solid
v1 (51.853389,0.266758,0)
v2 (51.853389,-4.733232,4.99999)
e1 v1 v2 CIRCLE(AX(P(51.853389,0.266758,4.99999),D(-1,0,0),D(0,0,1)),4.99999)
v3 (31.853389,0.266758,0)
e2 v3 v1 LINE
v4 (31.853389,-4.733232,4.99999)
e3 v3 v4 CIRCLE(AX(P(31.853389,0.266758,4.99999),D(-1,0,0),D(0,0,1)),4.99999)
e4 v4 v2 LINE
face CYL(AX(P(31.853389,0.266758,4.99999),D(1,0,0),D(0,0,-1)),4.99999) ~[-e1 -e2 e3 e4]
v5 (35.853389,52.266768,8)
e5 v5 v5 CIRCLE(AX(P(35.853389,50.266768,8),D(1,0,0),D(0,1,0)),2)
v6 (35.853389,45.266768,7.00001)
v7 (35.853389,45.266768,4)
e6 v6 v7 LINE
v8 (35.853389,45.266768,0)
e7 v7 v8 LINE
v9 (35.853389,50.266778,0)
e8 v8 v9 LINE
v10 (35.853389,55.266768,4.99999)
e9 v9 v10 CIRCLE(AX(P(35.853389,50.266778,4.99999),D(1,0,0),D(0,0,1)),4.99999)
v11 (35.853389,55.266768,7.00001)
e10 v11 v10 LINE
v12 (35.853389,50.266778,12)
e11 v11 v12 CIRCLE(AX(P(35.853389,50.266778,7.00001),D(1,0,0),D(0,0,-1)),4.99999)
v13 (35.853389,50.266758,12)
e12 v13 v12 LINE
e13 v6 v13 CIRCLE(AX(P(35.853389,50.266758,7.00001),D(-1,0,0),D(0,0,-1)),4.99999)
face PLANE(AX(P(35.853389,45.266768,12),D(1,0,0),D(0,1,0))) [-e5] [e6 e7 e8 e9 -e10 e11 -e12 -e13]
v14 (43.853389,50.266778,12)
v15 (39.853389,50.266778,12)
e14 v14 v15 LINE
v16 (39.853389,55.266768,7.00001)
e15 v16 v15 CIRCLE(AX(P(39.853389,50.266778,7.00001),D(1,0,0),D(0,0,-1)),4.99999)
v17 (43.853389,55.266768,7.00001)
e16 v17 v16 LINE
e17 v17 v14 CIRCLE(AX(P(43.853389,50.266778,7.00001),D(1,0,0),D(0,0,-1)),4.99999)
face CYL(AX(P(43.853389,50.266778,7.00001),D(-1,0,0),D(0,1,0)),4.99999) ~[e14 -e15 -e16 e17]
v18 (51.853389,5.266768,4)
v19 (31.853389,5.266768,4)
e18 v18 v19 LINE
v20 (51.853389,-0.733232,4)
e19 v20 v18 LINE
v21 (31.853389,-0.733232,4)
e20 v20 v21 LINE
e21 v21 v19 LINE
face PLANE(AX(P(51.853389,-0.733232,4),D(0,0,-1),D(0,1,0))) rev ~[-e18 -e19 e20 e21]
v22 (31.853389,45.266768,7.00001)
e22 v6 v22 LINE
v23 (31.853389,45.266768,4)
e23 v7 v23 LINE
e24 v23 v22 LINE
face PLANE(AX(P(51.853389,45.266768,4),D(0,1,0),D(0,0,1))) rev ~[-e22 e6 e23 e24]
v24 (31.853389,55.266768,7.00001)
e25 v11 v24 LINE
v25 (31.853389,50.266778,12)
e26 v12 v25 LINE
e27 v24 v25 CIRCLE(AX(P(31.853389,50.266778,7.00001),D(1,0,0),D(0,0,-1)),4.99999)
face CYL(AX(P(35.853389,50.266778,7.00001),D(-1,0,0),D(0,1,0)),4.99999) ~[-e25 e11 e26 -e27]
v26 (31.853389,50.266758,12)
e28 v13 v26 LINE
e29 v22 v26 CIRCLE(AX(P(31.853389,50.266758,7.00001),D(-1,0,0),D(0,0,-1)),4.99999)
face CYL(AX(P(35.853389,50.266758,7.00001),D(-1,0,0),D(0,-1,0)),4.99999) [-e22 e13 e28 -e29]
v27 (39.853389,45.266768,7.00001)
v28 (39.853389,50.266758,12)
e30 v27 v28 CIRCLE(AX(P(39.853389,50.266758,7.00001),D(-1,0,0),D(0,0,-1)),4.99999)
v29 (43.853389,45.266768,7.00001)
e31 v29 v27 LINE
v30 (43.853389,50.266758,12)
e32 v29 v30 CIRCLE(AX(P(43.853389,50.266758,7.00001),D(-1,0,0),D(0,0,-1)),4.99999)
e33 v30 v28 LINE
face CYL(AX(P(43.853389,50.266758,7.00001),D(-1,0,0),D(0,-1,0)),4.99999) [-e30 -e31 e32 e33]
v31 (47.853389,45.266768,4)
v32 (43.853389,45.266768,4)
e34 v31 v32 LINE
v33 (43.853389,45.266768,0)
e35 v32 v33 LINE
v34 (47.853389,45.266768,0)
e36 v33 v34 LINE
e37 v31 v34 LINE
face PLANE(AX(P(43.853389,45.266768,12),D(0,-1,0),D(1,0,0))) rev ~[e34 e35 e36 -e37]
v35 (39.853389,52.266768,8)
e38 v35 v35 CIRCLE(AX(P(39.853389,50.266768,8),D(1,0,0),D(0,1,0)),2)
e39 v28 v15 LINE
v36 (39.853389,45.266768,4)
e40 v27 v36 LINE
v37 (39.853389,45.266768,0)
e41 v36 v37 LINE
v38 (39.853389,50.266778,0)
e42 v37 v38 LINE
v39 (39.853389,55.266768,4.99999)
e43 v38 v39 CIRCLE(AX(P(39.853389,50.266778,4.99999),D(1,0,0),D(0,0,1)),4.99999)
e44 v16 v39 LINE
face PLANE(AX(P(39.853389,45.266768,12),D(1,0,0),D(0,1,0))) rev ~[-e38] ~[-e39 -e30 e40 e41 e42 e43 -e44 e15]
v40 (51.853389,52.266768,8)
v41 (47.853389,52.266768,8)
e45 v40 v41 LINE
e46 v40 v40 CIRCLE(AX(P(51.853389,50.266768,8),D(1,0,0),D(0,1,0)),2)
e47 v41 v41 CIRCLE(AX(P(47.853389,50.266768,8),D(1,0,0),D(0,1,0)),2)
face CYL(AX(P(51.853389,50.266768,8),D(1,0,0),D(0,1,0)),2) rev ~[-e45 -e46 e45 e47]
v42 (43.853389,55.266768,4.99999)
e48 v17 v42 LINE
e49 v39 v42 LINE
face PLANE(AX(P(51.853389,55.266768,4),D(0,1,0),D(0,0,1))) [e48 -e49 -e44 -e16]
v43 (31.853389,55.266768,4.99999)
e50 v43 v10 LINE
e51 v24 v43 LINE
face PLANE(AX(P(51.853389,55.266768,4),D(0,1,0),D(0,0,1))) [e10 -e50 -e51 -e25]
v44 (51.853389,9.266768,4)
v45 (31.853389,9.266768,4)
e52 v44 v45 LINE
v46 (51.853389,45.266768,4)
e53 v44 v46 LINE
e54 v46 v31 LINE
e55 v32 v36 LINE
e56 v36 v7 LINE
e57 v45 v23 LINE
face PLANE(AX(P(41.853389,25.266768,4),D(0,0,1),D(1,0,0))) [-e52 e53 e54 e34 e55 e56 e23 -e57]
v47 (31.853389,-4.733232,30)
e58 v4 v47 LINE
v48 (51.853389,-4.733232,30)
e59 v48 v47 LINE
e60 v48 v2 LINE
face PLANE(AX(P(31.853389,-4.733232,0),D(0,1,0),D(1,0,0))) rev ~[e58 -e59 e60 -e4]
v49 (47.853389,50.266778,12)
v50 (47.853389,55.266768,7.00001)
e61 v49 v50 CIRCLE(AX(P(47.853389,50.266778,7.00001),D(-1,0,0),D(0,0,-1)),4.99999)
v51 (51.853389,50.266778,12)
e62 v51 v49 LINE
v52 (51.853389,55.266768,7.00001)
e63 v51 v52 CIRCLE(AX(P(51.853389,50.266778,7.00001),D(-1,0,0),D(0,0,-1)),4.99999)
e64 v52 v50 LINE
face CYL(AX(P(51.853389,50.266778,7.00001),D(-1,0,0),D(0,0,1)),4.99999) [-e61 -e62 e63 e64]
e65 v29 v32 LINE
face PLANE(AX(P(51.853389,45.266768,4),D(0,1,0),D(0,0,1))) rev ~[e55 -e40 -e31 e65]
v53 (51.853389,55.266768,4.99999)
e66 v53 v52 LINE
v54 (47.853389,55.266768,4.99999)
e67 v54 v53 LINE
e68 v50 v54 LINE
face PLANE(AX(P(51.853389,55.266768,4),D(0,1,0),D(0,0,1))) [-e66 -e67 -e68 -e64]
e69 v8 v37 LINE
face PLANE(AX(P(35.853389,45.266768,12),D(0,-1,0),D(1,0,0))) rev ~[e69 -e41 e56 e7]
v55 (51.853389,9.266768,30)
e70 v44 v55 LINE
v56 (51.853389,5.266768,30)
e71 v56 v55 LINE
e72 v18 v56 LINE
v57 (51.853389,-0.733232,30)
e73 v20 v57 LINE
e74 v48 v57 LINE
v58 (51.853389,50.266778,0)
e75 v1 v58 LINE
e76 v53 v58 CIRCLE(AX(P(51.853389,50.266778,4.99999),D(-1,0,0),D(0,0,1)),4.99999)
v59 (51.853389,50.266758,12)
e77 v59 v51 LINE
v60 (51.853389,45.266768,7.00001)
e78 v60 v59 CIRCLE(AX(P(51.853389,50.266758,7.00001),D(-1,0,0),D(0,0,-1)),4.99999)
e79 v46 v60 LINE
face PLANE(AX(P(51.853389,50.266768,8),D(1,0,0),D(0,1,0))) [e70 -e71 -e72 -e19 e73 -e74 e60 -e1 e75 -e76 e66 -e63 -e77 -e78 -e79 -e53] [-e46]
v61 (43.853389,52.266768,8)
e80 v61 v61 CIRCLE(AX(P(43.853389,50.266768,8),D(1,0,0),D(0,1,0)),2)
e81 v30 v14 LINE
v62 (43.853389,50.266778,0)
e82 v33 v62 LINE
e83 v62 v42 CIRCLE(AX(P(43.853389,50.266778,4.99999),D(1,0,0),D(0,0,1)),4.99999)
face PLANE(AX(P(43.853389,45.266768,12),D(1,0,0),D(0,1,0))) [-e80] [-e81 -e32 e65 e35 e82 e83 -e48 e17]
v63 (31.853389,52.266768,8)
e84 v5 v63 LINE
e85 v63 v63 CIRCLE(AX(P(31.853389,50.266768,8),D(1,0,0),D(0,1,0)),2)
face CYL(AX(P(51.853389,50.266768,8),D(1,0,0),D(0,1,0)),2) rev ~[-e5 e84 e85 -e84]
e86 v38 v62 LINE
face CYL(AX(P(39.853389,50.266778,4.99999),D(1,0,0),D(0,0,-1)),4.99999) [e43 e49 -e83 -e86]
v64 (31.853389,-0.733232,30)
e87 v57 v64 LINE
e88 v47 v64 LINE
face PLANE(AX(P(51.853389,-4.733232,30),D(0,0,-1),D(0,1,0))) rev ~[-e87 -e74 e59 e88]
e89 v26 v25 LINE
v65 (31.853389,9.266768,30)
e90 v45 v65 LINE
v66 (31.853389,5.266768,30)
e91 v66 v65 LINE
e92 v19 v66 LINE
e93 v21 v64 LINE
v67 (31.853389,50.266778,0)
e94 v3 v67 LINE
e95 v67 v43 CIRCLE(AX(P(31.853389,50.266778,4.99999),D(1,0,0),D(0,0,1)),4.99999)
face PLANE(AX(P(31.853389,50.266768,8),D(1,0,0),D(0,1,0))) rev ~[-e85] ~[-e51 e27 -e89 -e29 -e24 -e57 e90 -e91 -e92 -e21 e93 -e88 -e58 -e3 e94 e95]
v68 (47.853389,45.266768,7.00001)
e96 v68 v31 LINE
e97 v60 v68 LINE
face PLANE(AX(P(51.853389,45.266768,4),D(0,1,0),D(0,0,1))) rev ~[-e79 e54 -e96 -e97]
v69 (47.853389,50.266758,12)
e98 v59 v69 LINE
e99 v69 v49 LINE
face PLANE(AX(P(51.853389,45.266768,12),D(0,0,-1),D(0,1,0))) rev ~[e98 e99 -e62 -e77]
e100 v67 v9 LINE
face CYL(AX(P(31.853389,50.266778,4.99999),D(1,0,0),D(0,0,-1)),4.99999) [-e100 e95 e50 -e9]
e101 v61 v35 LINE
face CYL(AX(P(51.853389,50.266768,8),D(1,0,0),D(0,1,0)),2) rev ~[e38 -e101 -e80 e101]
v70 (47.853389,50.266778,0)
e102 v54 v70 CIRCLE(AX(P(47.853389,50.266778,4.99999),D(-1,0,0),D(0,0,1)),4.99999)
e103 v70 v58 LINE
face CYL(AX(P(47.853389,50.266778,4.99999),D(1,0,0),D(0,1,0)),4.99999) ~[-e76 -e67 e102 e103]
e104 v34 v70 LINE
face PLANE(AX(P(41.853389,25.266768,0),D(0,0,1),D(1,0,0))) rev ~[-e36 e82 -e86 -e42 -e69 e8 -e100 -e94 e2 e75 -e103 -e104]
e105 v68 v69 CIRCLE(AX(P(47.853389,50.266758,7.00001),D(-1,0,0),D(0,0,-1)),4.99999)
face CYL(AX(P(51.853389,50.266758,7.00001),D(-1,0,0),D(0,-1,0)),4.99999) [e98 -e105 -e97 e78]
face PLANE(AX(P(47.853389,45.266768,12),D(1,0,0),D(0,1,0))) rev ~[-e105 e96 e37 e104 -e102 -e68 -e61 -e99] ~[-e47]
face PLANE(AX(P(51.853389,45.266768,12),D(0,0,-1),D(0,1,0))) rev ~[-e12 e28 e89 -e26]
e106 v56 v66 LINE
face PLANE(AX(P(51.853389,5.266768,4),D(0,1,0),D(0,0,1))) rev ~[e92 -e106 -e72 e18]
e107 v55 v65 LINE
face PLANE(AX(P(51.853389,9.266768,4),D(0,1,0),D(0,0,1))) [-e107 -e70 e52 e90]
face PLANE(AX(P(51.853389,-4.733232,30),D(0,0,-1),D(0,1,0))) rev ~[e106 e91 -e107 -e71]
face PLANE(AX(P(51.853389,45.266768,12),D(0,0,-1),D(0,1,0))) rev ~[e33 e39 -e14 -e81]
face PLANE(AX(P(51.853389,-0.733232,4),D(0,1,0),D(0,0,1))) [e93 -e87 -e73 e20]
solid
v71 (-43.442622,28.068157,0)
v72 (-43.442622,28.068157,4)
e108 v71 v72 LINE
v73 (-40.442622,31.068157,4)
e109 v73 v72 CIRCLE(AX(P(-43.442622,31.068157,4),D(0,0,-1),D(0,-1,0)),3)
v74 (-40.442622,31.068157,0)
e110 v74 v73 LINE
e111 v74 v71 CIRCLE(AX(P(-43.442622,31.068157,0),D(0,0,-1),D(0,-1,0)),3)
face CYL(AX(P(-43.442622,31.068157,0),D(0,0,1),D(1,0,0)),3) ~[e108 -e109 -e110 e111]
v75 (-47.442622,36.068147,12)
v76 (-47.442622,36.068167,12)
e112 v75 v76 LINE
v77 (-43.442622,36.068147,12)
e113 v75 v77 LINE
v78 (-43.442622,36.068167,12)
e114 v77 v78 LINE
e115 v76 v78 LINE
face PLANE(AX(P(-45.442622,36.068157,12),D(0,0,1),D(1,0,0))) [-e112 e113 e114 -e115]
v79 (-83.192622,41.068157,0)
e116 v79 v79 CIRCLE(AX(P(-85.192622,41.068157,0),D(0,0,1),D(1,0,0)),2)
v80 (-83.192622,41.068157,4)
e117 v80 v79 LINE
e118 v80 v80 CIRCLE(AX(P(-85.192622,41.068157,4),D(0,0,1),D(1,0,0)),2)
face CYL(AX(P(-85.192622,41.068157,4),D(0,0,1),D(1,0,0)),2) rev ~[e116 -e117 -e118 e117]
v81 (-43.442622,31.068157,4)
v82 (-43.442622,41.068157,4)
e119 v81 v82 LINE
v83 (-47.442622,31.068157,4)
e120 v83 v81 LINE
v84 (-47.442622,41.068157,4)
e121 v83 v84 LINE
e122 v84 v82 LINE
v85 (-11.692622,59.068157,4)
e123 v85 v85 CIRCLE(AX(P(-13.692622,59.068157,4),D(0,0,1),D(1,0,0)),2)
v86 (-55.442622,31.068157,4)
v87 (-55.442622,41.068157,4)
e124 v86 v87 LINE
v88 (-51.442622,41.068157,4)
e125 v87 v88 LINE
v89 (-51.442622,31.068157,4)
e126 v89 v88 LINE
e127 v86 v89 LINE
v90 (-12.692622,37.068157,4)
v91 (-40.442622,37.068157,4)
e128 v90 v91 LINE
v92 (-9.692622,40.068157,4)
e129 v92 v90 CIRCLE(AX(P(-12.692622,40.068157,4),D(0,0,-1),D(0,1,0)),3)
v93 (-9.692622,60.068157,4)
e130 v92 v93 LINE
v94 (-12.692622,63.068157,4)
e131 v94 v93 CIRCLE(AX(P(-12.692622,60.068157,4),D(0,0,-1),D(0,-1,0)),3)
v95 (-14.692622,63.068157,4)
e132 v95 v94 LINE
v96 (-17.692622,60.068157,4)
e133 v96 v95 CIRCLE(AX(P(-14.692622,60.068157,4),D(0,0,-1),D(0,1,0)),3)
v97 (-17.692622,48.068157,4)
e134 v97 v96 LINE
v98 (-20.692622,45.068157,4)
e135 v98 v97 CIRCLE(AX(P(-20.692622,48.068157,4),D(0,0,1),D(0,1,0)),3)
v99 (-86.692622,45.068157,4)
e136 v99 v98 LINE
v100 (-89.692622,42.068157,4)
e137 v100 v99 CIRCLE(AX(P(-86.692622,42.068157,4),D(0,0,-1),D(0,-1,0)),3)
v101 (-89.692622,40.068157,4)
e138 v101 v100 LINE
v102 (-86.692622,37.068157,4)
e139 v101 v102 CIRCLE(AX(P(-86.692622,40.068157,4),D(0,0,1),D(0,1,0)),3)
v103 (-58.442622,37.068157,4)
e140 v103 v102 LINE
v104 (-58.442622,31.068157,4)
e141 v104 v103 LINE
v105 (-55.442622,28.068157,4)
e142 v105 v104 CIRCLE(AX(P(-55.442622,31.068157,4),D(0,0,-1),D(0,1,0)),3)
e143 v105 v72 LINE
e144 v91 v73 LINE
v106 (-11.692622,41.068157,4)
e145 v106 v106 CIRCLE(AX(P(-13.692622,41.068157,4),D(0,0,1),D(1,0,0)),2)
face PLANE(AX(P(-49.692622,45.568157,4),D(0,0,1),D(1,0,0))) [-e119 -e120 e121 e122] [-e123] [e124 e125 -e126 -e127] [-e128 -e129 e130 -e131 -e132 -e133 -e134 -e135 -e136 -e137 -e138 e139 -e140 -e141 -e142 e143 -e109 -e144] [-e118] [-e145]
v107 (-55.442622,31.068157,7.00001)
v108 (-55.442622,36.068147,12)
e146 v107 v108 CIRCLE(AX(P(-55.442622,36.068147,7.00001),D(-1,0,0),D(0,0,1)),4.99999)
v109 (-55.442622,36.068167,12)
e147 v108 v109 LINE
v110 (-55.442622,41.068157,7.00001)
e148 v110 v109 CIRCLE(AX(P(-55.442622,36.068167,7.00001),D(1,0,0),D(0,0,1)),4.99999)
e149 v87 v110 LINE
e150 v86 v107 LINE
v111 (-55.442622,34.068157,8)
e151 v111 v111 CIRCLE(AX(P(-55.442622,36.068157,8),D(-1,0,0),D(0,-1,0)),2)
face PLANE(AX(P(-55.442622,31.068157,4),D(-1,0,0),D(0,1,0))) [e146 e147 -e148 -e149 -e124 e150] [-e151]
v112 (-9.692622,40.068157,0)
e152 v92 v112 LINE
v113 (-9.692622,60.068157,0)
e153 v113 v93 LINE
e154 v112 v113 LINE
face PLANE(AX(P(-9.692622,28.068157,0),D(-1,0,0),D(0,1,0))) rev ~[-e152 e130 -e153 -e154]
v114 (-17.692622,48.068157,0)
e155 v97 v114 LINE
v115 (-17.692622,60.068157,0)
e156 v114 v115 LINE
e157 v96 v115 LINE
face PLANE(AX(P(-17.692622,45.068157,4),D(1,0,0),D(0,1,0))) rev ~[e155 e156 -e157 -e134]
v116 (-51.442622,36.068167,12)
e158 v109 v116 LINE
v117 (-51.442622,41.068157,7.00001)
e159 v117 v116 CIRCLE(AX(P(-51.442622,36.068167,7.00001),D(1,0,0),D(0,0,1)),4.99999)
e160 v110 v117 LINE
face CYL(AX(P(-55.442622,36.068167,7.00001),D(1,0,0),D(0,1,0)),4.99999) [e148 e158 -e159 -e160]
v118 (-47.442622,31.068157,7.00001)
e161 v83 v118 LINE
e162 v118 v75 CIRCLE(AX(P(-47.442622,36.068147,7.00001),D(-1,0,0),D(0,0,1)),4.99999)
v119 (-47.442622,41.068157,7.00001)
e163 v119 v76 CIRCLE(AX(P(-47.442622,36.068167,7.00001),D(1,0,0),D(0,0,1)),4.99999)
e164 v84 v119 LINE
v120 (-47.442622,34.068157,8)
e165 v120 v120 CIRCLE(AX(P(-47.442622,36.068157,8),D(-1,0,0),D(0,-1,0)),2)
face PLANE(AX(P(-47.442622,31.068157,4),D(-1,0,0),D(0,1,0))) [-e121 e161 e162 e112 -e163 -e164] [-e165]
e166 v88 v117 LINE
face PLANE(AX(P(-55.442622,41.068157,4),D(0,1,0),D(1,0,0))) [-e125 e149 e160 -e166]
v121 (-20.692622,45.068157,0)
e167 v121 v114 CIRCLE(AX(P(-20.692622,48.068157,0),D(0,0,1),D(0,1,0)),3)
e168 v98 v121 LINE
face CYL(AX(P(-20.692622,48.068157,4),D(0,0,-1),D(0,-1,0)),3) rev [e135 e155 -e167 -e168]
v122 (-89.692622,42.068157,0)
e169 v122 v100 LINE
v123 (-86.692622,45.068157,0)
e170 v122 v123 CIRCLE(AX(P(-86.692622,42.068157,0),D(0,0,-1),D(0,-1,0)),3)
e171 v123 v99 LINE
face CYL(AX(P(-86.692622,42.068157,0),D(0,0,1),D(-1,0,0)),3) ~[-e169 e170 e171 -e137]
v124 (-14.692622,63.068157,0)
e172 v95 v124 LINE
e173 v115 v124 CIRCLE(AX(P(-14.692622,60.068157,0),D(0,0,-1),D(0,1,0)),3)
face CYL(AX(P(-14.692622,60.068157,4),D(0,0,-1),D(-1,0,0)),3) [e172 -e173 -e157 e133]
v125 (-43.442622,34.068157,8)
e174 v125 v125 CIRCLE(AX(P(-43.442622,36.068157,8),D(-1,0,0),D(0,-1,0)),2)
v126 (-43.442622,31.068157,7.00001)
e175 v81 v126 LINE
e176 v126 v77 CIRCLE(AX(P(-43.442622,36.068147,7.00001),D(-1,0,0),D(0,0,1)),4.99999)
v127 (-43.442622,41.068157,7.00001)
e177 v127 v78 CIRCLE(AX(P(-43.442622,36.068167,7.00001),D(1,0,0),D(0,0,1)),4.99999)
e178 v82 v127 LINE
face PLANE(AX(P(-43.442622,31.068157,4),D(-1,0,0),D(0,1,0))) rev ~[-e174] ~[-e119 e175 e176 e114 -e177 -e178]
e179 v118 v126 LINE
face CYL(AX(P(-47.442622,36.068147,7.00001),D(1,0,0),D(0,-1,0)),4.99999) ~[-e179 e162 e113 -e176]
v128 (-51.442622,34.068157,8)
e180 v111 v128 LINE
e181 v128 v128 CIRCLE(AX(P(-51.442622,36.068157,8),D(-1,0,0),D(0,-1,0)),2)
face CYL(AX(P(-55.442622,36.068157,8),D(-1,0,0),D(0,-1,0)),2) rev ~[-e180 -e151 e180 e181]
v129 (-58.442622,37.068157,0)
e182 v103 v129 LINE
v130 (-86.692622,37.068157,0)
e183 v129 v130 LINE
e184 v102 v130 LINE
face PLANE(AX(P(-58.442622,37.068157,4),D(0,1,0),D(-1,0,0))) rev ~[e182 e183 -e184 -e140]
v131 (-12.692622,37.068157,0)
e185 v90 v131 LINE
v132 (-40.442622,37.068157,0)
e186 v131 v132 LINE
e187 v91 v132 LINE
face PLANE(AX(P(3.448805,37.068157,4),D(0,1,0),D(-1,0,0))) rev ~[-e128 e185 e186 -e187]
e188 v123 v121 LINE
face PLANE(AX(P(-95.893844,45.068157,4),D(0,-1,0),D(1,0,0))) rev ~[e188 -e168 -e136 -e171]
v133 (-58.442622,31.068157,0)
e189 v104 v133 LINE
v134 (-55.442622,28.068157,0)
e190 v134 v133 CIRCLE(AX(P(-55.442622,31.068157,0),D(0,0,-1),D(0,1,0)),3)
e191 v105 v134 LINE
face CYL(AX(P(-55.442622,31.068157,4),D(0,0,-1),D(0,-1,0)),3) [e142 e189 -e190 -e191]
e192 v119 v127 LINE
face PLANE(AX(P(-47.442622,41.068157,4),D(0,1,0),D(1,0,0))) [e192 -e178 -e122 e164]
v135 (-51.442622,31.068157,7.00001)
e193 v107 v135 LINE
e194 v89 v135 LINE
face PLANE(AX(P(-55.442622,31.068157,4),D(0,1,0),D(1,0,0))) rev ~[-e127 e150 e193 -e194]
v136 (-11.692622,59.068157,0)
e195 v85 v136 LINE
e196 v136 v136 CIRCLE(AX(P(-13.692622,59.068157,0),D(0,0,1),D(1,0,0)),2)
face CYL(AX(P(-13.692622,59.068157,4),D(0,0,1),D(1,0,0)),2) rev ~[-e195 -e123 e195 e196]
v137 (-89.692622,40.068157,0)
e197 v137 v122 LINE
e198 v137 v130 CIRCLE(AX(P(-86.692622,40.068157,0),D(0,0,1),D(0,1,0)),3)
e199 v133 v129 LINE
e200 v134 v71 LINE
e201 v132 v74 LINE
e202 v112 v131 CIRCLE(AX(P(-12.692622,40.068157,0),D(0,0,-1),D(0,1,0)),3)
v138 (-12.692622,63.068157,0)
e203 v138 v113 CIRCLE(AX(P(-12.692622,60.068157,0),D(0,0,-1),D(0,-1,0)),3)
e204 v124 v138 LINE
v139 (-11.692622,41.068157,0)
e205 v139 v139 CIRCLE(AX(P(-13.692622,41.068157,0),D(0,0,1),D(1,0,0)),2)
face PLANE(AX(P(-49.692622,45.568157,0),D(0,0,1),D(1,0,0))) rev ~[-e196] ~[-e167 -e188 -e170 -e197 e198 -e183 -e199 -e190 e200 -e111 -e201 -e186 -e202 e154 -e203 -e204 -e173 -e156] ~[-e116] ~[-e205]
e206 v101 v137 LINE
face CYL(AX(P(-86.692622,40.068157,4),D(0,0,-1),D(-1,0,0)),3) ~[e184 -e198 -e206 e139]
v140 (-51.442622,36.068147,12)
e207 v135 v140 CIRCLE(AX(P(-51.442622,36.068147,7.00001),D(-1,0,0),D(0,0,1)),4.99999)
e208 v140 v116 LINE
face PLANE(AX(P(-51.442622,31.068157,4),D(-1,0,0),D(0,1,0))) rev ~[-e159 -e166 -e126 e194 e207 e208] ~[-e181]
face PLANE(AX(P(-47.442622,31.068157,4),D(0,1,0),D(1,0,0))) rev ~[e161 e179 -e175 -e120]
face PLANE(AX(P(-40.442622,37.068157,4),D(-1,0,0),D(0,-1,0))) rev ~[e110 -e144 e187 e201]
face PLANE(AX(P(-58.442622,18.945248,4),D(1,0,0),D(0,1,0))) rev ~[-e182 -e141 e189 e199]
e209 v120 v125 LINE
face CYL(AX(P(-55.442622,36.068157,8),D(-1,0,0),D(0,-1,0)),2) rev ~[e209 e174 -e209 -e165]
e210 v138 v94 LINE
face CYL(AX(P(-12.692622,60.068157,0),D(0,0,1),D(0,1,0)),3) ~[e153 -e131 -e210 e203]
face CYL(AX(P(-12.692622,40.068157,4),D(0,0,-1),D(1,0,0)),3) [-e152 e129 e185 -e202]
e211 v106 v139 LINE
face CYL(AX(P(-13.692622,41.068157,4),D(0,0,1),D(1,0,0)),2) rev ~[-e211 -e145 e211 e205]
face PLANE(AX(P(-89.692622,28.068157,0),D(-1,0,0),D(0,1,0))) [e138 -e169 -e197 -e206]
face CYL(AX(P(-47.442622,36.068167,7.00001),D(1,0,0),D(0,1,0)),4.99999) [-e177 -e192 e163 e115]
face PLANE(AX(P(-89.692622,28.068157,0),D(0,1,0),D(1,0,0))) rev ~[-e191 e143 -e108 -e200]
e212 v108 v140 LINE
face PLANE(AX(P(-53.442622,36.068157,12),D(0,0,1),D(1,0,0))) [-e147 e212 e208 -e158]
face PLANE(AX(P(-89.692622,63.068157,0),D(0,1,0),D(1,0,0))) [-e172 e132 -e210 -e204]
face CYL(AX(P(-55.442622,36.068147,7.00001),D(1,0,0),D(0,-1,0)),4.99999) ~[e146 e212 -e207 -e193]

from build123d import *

# Parameters (mm, degrees)
F0_W      = 80
F0_H      = 35
F1_DEPTH  = 4
F2_R      = 2
F2_W      = 78.2012213022
F2_H      = 24.0091495216
F3_DEPTH  = 25
F4_W      = 4
F4_H      = 10
F5_DEPTH  = 8
F6_R      = 2
F7_DEPTH  = 12
F8_R      = 4.99999
F9_W      = 30.75
F9_H      = 9
F9_W_2    = 31.25
F10_DEPTH = 25
F11_R     = 3
F12_W     = 20
F12_H     = 60
F13_DEPTH = 4
F14_W     = 10
F14_H     = 8
F14_W_2   = 14
F14_H_2   = 26
F15_DEPTH = 20
F16_R     = 2
F16_W     = 6
F16_H     = 26
F17_DEPTH = 20
F18_W     = 4
F18_H     = 10
F19_DEPTH = 12
F20_R     = 4.99999


# Not quite as in the source:
# - a fillet or chamfer is up to 0.001 mm smaller than in the source, because OpenCascade refuses the exact size


with BuildPart() as f1:
    # F0 (on Top) → F1 (new body)
    with BuildSketch(Plane.XY):
        with Locations((-49.6926223859, 45.5681574084)):
            Rectangle(F0_W, F0_H)
    extrude(amount=F1_DEPTH)

    # F2 (on face) → F3 (cut)
    with BuildSketch(Plane.XY.offset(4)):
        with Locations((-85.1926223859, 41.0681574084)):
            Circle(F2_R)
        with Locations((-13.6926223859, 41.0681574084)):
            Circle(F2_R)
        with Locations((-13.6926223859, 59.0681574084)):
            Circle(F2_R)
        with Locations((-56.793233037, 57.0727321692)):
            Rectangle(F2_W, F2_H)
    extrude(amount=-F3_DEPTH, mode=Mode.SUBTRACT)

    # F4 (on face) → F5 (join)
    with BuildSketch(Plane.XY.offset(4)):
        with Locations((-53.4426223859, 36.0681574084)):
            Rectangle(F4_W, F4_H)
        with Locations((-45.4426223859, 36.0681574084)):
            Rectangle(F4_W, F4_H)
    extrude(amount=F5_DEPTH)

    # F6 (on face) → F7 (cut)
    with BuildSketch(Plane(origin=(-55.4426223859, 0, 0), x_dir=(0, -1, 0), z_dir=(-1, 0, 0))):
        with Locations((-36.0681574084, 8)):
            Circle(F6_R)
    extrude(amount=-F7_DEPTH, mode=Mode.SUBTRACT)

    # F8 (radius 5 in the source; OpenCascade refuses exactly that, so slightly less here)
    f8_edges = [f1.edges().sort_by_distance(p)[0] for p in [
        (-53.442622, 41.068157, 12),
        (-45.442622, 41.068157, 12),
        (-53.442622, 31.068157, 12),
        (-45.442622, 31.068157, 12),
    ]]
    fillet(f8_edges, radius=F8_R)

    # F9 (on face) → F10 (cut)
    with BuildSketch(Plane.XY.offset(4)):
        Polygon((-89.6926223859, 37.0681574084), (-102.8804979962, 37.0681574084), (-102.8804979962, 18.9452479413), (-58.4426223859, 18.9452479413), (-58.4426223859, 28.0681574084), (-89.6926223859, 28.0681574084), align=None)
        Polygon((-9.6926223859, 28.0681574084), (-40.4426223859, 28.0681574084), (-40.4426223859, 16.9630516109), (3.4488050875, 16.9630516109), (3.4488050875, 37.0681574084), (-9.6926223859, 37.0681574084), align=None)
        with Locations((-25.0676223859, 32.5681574084)):
            Rectangle(F9_W, F9_H)
        with Locations((-74.0676223859, 32.5681574084)):
            Rectangle(F9_W_2, F9_H)
    extrude(amount=-F10_DEPTH, mode=Mode.SUBTRACT)

    # F11
    f11_edges = [f1.edges().sort_by_distance(p)[0] for p in [
        (-89.692622, 45.068157, 2),
        (-89.692622, 37.068157, 2),
        (-58.442622, 28.068157, 2),
        (-40.442622, 28.068157, 2),
        (-9.692622, 37.068157, 2),
        (-9.692622, 63.068157, 2),
        (-17.692622, 63.068157, 2),
        (-17.692622, 45.068157, 2),
    ]]
    fillet(f11_edges, radius=F11_R)


with BuildPart() as f13:
    # F12 (on Top) → F13 (new body)
    with BuildSketch(Plane.XY):
        with Locations((41.8533885479, 25.26676815)):
            Rectangle(F12_W, F12_H)
    extrude(amount=F13_DEPTH)

    # F14 (on face) → F15 (join)
    with BuildSketch(Plane.YZ.offset(51.8533885479)):
        with Locations((50.26676815, 8)):
            Rectangle(F14_W, F14_H)
        with Locations((2.26676815, 17)):
            Rectangle(F14_W_2, F14_H_2)
    extrude(amount=-F15_DEPTH)

    # F16 (on face) → F17 (cut)
    with BuildSketch(Plane.YZ.offset(51.8533885479)):
        with Locations((50.26676815, 8)):
            Circle(F16_R)
        with Locations((2.26676815, 17)):
            Rectangle(F16_W, F16_H)
    extrude(amount=-F17_DEPTH, mode=Mode.SUBTRACT)

    # F18 (on face) → F19 (cut)
    with BuildSketch(Plane.XY.offset(12)):
        with Locations((37.8533885479, 50.26676815)):
            Rectangle(F18_W, F18_H)
        with Locations((45.8533885479, 50.26676815)):
            Rectangle(F18_W, F18_H)
    extrude(amount=-F19_DEPTH, mode=Mode.SUBTRACT)

    # F20 (radius 5 in the source; OpenCascade refuses exactly that, so slightly less here)
    f20_edges = [f13.edges().sort_by_distance(p)[0] for p in [
        (41.853389, -4.733232, 0),
        (49.853389, 45.266768, 12),
        (49.853389, 55.266768, 12),
        (41.853389, 45.266768, 12),
        (41.853389, 55.266768, 12),
        (33.853389, 45.266768, 12),
        (33.853389, 55.266768, 12),
        (49.853389, 55.266768, 0),
        (41.853389, 55.266768, 0),
        (33.853389, 55.266768, 0),
    ]]
    fillet(f20_edges, radius=F20_R)


solid = Compound([f1.part, f13.part])
